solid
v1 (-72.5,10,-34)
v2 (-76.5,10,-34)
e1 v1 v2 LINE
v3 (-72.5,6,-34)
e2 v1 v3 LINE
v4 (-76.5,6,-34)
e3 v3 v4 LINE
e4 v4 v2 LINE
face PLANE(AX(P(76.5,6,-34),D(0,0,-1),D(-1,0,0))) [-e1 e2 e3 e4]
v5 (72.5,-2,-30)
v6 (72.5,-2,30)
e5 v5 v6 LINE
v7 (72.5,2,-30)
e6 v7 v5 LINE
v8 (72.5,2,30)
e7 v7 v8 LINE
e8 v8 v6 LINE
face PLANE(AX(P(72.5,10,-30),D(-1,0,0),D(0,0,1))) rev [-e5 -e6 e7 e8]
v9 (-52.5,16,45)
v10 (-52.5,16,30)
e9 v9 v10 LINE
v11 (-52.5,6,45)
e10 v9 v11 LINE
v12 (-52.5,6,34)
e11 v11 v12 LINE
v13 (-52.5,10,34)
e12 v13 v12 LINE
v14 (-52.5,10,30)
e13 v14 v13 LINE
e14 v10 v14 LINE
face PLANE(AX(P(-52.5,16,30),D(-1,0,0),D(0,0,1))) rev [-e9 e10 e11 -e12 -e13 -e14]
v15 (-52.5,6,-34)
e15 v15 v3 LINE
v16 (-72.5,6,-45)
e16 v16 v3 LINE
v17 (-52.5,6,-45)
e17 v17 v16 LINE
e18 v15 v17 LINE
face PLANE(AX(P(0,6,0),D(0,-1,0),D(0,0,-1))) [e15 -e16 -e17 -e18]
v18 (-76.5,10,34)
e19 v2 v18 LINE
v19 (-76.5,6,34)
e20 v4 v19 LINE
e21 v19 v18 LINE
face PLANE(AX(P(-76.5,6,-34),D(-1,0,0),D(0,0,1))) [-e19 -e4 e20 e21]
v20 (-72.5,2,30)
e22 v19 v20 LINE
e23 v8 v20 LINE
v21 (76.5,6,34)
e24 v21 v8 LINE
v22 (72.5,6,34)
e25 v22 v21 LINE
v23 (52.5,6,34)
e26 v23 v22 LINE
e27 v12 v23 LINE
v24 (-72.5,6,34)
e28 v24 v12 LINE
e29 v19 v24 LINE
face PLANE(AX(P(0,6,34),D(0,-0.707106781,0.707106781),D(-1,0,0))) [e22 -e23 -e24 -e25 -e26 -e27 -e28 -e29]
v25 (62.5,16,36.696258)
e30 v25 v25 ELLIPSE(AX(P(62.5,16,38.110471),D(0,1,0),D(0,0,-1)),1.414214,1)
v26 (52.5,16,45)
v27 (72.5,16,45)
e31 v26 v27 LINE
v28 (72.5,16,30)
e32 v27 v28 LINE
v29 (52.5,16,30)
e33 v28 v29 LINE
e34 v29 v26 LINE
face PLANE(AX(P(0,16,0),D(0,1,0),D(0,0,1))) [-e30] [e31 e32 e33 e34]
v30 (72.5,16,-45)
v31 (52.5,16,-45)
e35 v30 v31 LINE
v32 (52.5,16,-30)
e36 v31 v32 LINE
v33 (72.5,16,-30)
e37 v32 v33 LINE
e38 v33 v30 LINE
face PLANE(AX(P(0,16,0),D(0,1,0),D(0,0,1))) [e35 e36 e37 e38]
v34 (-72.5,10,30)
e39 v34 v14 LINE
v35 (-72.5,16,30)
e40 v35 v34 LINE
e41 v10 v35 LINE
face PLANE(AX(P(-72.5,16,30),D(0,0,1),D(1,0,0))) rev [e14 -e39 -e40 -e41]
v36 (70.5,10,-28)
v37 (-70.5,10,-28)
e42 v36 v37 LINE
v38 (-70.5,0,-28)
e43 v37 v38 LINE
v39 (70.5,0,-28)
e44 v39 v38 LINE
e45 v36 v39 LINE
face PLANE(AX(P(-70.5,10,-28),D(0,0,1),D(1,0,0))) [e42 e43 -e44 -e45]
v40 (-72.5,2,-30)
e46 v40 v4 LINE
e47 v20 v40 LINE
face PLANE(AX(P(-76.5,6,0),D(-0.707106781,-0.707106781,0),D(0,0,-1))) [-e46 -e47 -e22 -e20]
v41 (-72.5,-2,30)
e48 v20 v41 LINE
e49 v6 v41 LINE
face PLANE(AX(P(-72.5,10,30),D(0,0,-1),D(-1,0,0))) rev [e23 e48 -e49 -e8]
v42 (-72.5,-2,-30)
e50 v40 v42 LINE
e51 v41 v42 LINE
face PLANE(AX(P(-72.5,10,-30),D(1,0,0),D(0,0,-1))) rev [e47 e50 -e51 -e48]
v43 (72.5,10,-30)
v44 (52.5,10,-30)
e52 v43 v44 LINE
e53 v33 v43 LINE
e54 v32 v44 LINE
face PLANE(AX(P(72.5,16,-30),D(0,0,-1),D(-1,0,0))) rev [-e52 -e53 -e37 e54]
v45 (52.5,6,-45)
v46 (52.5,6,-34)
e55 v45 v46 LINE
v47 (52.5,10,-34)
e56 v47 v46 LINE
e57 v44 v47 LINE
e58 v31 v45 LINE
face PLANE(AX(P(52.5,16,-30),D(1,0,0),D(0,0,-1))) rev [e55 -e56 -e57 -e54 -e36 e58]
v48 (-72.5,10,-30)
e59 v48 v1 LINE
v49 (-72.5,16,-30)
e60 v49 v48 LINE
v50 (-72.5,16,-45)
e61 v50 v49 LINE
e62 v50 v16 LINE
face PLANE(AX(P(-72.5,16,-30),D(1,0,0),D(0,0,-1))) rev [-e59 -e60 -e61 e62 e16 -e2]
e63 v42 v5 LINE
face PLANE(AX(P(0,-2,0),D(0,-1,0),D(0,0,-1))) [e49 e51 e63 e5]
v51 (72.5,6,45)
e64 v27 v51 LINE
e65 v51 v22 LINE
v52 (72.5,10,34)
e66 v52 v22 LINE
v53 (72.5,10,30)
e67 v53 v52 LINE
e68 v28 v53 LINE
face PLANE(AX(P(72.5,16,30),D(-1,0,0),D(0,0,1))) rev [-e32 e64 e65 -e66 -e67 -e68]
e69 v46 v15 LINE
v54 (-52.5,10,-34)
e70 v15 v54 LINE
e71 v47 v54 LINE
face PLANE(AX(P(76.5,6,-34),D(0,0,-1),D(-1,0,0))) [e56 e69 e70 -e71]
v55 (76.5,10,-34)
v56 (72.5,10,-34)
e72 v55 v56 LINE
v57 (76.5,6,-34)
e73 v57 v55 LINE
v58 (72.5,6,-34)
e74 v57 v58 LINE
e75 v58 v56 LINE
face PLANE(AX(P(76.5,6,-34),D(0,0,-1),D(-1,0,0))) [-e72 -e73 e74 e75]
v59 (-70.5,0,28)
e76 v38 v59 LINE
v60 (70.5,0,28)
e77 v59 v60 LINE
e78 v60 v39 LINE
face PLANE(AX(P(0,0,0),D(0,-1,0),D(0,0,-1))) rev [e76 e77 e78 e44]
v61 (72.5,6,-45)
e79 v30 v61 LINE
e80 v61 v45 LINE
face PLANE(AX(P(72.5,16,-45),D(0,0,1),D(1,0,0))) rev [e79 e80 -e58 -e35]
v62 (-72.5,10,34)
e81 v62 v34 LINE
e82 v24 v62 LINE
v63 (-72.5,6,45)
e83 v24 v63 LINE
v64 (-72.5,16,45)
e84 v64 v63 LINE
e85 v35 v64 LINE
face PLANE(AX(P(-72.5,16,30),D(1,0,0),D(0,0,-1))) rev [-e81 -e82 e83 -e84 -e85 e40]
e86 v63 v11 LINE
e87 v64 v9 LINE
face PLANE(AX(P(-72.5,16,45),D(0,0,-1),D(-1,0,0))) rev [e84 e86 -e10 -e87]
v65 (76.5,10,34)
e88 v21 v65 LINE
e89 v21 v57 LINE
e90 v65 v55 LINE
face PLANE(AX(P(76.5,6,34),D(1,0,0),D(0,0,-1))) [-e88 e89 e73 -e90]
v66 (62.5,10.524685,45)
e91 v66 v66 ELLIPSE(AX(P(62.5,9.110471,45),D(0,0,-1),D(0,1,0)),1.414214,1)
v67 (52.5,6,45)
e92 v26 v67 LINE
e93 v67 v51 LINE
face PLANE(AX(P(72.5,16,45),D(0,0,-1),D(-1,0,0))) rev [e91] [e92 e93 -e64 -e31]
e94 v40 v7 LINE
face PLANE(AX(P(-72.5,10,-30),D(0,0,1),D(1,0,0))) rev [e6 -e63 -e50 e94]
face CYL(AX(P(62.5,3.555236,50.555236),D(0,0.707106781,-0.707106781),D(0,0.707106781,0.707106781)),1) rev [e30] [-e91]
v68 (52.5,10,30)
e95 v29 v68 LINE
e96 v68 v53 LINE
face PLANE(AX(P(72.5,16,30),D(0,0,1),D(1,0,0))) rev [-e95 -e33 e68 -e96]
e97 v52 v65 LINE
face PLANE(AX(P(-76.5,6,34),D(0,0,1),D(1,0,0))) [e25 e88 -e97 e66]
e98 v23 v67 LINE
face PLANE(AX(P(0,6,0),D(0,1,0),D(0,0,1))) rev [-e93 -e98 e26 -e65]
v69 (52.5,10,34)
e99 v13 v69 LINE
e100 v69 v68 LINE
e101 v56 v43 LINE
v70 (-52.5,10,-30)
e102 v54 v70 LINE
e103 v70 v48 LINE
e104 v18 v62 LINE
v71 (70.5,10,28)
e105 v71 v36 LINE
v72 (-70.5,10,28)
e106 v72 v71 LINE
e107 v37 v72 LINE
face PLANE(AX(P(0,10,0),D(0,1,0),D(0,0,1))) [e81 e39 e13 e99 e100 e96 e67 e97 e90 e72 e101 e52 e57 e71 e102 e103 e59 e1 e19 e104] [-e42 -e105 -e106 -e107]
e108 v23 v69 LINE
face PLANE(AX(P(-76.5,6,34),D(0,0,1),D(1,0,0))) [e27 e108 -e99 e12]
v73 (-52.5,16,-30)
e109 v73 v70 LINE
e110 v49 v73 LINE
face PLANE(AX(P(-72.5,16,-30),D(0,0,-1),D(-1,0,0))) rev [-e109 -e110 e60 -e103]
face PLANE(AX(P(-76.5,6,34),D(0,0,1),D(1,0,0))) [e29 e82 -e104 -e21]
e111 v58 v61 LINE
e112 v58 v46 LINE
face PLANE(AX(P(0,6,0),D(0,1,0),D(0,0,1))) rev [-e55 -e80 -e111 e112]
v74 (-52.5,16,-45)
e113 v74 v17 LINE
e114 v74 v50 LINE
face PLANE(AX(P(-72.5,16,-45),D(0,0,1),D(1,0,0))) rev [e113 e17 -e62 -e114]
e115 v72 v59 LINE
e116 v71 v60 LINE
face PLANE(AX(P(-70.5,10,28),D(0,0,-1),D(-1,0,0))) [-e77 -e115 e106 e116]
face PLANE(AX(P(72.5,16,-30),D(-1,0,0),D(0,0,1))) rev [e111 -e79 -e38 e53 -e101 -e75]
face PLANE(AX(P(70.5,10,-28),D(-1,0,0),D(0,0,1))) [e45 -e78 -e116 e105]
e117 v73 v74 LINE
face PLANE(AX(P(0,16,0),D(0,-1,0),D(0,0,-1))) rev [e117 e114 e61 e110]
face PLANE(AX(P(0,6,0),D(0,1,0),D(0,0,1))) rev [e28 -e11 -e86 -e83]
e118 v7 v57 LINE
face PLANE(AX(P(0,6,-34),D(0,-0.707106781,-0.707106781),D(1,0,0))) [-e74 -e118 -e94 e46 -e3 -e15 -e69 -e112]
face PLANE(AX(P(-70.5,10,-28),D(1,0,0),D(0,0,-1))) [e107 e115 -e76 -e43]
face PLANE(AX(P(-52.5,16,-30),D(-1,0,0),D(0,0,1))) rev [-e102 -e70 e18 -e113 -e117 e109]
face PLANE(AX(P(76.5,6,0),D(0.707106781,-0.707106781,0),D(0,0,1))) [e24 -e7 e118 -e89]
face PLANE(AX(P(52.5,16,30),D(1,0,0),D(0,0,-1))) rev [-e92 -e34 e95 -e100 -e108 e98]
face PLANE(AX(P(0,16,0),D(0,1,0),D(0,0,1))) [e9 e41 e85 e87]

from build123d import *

# Parameters (mm, degrees)
SKETCH1_W               = 145
SKETCH1_H               = 60
SKETCH1_W_2             = 141
SKETCH1_H_2             = 56
BOSS_EXTRUDE1_DEPTH     = 10
SKETCH2_W               = 145
SKETCH2_H               = 60
BOSS_EXTRUDE2_DEPTH     = 2
SKETCH3_W               = 153
SKETCH3_H               = 68
SKETCH3_W_2             = 145
SKETCH3_H_2             = 60
BOSS_EXTRUDE3_DEPTH     = 4
CHAMFER1_SIZE           = 4
BOSS_EXTRUDE4_START     = -4
SKETCH4_W               = 20
SKETCH4_H               = 15
BOSS_EXTRUDE4_DEPTH     = 10
CUT_EXTRUDE2_DEPTH      = 102.600935035
CUT_EXTRUDE2_DEPTH_BACK = 102.600935035
SKETCH6_R               = 1


with BuildPart() as part:
    # Sketch1 → Boss-Extrude1 (new body)
    with BuildSketch(Plane(origin=(0, 0, 0), x_dir=(1, 0, 0), z_dir=(0, 1, 0))):
        Rectangle(SKETCH1_W, SKETCH1_H)
        Rectangle(SKETCH1_W_2, SKETCH1_H_2, mode=Mode.SUBTRACT)
    extrude(amount=BOSS_EXTRUDE1_DEPTH)

    # Sketch2 → Boss-Extrude2 (add)
    with BuildSketch(Plane.XZ):
        Rectangle(SKETCH2_W, SKETCH2_H)
    extrude(amount=BOSS_EXTRUDE2_DEPTH)

    # Sketch3 → Boss-Extrude3 (add)
    with BuildSketch(Plane(origin=(0, 10, 0), x_dir=(1, 0, 0), z_dir=(0, 1, 0))):
        Rectangle(SKETCH3_W, SKETCH3_H)
        Rectangle(SKETCH3_W_2, SKETCH3_H_2, mode=Mode.SUBTRACT)
    extrude(amount=-BOSS_EXTRUDE3_DEPTH)

    # Chamfer1
    chamfer1_edges = [part.edges().sort_by_distance(p)[0] for p in [
        (-72.5, 6, 0),
        (0, 6, 30),
        (72.5, 6, 0),
        (0, 6, -30),
    ]]
    chamfer(chamfer1_edges, length=CHAMFER1_SIZE - 0.0001)  # a hair under: the kernel refuses the full size

    # Sketch4 → Boss-Extrude4 (add)
    with BuildSketch(Plane(origin=(0, 10, 0), x_dir=(1, 0, 0), z_dir=(0, 1, 0)).offset(BOSS_EXTRUDE4_START)):
        with Locations((-62.5, 37.5)):
            Rectangle(SKETCH4_W, SKETCH4_H)
        with Locations((-62.5, -37.5)):
            Rectangle(SKETCH4_W, SKETCH4_H)
        with Locations((62.5, -37.5)):
            Rectangle(SKETCH4_W, SKETCH4_H)
        with Locations((62.5, 37.5)):
            Rectangle(SKETCH4_W, SKETCH4_H)
    extrude(amount=BOSS_EXTRUDE4_DEPTH)

    # Sketch6 → Cut-Extrude2 (cut, two sides: drawn at the far end of the back side and taken through both)
    with BuildSketch(Plane(origin=(0, -14.5, 14.5), x_dir=(1, 0, 0), z_dir=(0, 0.7071067811865464, -0.7071067811865488)).offset(-CUT_EXTRUDE2_DEPTH_BACK)):
        with Locations(Location((62.5, -38.261881076, 0), (0, 0, 270))):
            Circle(SKETCH6_R)
    extrude(amount=CUT_EXTRUDE2_DEPTH + CUT_EXTRUDE2_DEPTH_BACK, mode=Mode.SUBTRACT)


solid = part.part
